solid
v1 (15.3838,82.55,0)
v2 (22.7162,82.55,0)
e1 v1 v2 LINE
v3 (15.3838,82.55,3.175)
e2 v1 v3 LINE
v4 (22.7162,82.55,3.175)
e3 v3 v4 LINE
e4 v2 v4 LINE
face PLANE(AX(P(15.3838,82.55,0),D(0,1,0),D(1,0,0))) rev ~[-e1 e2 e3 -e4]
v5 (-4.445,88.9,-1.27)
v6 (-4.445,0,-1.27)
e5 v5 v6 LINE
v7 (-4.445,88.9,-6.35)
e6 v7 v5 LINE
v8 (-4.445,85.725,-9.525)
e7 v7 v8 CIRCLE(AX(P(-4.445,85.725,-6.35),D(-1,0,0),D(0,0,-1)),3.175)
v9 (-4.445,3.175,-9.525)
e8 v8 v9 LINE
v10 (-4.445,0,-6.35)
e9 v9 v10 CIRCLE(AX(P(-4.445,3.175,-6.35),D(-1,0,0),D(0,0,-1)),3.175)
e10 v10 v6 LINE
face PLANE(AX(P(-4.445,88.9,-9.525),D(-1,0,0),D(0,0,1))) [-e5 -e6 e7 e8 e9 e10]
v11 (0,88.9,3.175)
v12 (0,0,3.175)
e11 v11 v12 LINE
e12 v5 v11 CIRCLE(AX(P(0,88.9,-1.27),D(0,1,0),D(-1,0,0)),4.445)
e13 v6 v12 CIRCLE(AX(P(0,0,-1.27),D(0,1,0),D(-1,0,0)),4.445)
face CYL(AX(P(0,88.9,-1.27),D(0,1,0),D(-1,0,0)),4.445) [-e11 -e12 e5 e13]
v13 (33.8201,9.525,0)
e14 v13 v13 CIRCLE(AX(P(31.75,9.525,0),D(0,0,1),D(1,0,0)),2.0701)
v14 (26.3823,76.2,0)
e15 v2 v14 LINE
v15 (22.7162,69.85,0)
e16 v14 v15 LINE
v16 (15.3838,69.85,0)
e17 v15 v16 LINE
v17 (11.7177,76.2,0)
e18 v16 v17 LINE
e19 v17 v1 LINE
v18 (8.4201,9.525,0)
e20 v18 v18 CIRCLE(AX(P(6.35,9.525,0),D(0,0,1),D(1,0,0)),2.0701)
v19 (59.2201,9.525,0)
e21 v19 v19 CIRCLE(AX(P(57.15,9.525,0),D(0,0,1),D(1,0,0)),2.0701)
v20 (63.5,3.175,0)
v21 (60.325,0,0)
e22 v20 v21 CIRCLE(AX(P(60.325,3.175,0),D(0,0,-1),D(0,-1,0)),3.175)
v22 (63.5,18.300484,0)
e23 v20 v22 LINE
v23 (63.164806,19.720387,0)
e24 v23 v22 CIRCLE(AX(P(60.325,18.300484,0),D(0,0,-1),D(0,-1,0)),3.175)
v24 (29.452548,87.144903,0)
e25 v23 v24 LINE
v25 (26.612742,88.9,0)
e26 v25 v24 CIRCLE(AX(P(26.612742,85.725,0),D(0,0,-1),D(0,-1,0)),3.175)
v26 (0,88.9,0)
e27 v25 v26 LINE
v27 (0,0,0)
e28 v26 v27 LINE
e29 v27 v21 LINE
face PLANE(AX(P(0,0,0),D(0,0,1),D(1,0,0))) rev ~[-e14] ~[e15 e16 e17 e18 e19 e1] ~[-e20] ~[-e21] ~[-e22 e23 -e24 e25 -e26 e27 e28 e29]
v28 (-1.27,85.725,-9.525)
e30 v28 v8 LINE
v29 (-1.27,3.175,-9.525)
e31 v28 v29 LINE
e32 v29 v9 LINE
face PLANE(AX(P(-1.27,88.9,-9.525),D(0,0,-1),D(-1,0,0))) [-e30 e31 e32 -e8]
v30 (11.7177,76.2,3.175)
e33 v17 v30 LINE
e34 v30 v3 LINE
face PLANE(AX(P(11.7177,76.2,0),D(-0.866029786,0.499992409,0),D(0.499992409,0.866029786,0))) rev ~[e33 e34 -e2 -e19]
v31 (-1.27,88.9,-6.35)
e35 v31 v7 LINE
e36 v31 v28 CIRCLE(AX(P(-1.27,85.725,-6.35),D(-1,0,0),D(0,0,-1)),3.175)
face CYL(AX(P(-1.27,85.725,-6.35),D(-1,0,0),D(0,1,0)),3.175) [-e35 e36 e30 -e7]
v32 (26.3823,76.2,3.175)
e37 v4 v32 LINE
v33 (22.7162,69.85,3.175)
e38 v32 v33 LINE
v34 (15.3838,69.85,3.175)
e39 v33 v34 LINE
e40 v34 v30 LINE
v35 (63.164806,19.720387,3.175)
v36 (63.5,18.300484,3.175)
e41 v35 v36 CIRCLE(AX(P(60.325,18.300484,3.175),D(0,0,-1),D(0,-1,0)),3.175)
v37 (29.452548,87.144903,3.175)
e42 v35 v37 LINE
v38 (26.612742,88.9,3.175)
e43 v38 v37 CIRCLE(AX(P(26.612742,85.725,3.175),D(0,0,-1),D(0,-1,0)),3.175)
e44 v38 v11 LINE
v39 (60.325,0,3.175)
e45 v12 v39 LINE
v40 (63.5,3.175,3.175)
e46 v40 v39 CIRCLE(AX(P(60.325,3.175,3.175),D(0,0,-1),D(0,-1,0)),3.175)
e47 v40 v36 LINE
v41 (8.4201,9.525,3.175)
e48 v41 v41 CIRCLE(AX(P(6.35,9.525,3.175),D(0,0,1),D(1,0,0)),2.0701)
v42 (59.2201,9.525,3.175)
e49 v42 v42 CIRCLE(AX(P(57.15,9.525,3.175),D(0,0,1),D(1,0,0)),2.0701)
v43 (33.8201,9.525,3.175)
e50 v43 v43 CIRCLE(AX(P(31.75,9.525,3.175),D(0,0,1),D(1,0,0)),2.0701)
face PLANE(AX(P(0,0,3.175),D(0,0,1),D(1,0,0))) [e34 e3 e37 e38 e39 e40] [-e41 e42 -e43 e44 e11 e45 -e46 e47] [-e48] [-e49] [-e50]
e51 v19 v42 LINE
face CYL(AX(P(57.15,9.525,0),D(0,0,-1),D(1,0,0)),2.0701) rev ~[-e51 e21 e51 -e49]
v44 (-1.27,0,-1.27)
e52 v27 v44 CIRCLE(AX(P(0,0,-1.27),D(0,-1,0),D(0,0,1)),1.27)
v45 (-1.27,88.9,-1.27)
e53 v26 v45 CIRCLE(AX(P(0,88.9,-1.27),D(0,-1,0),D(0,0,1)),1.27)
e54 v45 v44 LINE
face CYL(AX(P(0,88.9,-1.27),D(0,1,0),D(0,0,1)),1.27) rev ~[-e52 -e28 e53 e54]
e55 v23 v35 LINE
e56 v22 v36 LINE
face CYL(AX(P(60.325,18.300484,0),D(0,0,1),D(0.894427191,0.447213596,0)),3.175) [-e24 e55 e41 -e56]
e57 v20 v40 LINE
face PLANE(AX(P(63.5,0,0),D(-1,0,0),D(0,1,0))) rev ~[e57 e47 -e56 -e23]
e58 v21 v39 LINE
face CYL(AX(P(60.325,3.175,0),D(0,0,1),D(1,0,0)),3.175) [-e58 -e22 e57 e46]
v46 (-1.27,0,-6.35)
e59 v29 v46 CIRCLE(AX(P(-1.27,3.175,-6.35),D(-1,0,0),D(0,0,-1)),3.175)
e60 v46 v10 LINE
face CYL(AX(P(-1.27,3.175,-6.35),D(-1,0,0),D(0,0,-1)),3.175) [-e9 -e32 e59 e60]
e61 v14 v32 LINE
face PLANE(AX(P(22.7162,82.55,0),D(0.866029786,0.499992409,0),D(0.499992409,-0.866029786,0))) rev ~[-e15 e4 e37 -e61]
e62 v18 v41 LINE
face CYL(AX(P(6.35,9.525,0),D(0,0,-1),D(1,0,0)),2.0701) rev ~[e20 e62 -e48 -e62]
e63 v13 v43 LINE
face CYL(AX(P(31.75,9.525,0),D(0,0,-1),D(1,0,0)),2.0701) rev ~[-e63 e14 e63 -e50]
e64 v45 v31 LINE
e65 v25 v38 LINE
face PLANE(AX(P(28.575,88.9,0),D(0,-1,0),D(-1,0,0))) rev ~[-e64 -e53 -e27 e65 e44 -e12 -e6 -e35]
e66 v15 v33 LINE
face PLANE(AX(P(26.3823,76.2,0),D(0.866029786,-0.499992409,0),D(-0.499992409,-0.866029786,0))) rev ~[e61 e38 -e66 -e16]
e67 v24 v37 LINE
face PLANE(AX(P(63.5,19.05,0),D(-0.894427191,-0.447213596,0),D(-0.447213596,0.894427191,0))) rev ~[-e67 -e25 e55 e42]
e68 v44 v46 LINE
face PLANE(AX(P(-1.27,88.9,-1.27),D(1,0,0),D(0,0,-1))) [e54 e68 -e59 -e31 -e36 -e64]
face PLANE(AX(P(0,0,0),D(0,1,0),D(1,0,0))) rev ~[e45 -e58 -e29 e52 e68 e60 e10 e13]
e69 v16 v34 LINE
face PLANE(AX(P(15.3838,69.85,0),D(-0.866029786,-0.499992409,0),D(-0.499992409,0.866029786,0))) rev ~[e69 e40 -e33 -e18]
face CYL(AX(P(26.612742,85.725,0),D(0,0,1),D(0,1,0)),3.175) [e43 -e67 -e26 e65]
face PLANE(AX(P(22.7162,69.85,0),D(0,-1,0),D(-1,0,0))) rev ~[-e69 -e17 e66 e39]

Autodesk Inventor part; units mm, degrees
ref_plane "YZ Plane" through (0, 0, 0) normal (1, 0, 0) x (0, 1, 0)
ref_plane "XZ Plane" through (0, 0, 0) normal (0, 1, 0) x (-1, 0, 0)
ref_plane "XY Plane" through (0, 0, 0) normal (0, 0, 1) x (1, 0, 0)
sketch "Sketch1" plane through (0, 0, 0) normal (0, 0, 1) x (1, 0, 0)
  line L0 (0, 0) -> (63.5, 0)
  line L1 (63.5, 0) -> (63.5, 19.05)
  line L2 (0, 88.9) -> (0, 0)
  circle A0 centre (6.35, 9.525) radius 2.0701
  circle A1 centre (31.75, 9.525) radius 2.0701
  circle A2 centre (57.15, 9.525) radius 2.0701
  line L3 (63.5, 19.05) -> (28.575, 88.9)
  line L4 (28.575, 88.9) -> (0, 88.9)
  line L5 (22.7162, 82.55) -> (26.3823, 76.2)
  line L6 (26.3823, 76.2) -> (22.7162, 69.85)
  line L7 (22.7162, 69.85) -> (15.3838, 69.85)
  line L8 (15.3838, 69.85) -> (11.7177, 76.2)
  line L9 (11.7177, 76.2) -> (15.3838, 82.55)
  line L10 (15.3838, 82.55) -> (22.7162, 82.55)
  point P0 (19.05, 76.2)
  dimension "d5" = 63.5
  dimension "d6" = 4.1402
  dimension "d7" = 6.35
  dimension "d8" = 9.525
  dimension "d24" = 25.4
  dimension "d29" = 88.9
  dimension "d30" = 19.05
  dimension "d31" = 28.575
  dimension "d32" = 12.7
  dimension "d34" = 19.05
  dimension "d35" = 12.7
extrude "Plate1" add sketch "Sketch1" along normal blind 3.175
sketch "Sketch3" plane through (-1.27, 88.9, -1.27) normal (-1, 0, 0) x (0, -1, 0)
  line L0 (88.9, 0) -> (0, 0)
  line L1 (0, 0) -> (0, -8.255)
  line L2 (0, -8.255) -> (88.9, -8.255)
  line L3 (88.9, -8.255) -> (88.9, 0)
edge flange "Flange2" height 12.7 angle 90 thickness 3.175 bend radius 1.27 thickness toward (-1, 0, 0) relief tear relief width 3.175 relief depth 1.5875 edges at (0, 44.45, 0) wall of the first edge with corners at (-1.27, 0, -1.27) (-1.27, 88.9, -1.27) (-1.27, 88.9, -9.525) (-1.27, 0, -9.525)
bend "Bend2"
corner "Corner2"
fillet "Fillet1" radius 3.175 5 edges at (28.575, 88.9, 1.5875) (-2.8575, 0, -9.525) (63.5, 19.05, 1.5875) (63.5, 0, 1.5875) (-2.8575, 88.9, -9.525)
equation "\"d36\" = BendReliefWidth"
equation "\"d37\" = BendReliefDepth"
equation "\"d38\" = MinimumRemnant"
equation "\"d39\" = BendRadius"
equation "\"d43\" = CornerReliefSize"
equation "\"d44\" = GapSize"
equation "\"d45\" = JacobiRadiusSize"
equation "\"BendRadius\" = Thickness"
equation "\"BendReliefWidth\" = Thickness"
equation "\"BendReliefDepth\" = 0.5 * Thickness"
equation "\"CornerReliefSize\" = 4 * Thickness"
equation "\"MinimumRemnant\" = 2 * Thickness"
equation "\"TransitionRadius\" = BendRadius"
equation "\"JacobiRadiusSize\" = BendRadius"
equation "\"GapSize\" = Thickness"
equation "\"d11\" = BendRadius"
equation "\"Thickness\" = 3.175"
properties part number "Spacer 3 (L-L) ipt" material "Aluminum 6061"
